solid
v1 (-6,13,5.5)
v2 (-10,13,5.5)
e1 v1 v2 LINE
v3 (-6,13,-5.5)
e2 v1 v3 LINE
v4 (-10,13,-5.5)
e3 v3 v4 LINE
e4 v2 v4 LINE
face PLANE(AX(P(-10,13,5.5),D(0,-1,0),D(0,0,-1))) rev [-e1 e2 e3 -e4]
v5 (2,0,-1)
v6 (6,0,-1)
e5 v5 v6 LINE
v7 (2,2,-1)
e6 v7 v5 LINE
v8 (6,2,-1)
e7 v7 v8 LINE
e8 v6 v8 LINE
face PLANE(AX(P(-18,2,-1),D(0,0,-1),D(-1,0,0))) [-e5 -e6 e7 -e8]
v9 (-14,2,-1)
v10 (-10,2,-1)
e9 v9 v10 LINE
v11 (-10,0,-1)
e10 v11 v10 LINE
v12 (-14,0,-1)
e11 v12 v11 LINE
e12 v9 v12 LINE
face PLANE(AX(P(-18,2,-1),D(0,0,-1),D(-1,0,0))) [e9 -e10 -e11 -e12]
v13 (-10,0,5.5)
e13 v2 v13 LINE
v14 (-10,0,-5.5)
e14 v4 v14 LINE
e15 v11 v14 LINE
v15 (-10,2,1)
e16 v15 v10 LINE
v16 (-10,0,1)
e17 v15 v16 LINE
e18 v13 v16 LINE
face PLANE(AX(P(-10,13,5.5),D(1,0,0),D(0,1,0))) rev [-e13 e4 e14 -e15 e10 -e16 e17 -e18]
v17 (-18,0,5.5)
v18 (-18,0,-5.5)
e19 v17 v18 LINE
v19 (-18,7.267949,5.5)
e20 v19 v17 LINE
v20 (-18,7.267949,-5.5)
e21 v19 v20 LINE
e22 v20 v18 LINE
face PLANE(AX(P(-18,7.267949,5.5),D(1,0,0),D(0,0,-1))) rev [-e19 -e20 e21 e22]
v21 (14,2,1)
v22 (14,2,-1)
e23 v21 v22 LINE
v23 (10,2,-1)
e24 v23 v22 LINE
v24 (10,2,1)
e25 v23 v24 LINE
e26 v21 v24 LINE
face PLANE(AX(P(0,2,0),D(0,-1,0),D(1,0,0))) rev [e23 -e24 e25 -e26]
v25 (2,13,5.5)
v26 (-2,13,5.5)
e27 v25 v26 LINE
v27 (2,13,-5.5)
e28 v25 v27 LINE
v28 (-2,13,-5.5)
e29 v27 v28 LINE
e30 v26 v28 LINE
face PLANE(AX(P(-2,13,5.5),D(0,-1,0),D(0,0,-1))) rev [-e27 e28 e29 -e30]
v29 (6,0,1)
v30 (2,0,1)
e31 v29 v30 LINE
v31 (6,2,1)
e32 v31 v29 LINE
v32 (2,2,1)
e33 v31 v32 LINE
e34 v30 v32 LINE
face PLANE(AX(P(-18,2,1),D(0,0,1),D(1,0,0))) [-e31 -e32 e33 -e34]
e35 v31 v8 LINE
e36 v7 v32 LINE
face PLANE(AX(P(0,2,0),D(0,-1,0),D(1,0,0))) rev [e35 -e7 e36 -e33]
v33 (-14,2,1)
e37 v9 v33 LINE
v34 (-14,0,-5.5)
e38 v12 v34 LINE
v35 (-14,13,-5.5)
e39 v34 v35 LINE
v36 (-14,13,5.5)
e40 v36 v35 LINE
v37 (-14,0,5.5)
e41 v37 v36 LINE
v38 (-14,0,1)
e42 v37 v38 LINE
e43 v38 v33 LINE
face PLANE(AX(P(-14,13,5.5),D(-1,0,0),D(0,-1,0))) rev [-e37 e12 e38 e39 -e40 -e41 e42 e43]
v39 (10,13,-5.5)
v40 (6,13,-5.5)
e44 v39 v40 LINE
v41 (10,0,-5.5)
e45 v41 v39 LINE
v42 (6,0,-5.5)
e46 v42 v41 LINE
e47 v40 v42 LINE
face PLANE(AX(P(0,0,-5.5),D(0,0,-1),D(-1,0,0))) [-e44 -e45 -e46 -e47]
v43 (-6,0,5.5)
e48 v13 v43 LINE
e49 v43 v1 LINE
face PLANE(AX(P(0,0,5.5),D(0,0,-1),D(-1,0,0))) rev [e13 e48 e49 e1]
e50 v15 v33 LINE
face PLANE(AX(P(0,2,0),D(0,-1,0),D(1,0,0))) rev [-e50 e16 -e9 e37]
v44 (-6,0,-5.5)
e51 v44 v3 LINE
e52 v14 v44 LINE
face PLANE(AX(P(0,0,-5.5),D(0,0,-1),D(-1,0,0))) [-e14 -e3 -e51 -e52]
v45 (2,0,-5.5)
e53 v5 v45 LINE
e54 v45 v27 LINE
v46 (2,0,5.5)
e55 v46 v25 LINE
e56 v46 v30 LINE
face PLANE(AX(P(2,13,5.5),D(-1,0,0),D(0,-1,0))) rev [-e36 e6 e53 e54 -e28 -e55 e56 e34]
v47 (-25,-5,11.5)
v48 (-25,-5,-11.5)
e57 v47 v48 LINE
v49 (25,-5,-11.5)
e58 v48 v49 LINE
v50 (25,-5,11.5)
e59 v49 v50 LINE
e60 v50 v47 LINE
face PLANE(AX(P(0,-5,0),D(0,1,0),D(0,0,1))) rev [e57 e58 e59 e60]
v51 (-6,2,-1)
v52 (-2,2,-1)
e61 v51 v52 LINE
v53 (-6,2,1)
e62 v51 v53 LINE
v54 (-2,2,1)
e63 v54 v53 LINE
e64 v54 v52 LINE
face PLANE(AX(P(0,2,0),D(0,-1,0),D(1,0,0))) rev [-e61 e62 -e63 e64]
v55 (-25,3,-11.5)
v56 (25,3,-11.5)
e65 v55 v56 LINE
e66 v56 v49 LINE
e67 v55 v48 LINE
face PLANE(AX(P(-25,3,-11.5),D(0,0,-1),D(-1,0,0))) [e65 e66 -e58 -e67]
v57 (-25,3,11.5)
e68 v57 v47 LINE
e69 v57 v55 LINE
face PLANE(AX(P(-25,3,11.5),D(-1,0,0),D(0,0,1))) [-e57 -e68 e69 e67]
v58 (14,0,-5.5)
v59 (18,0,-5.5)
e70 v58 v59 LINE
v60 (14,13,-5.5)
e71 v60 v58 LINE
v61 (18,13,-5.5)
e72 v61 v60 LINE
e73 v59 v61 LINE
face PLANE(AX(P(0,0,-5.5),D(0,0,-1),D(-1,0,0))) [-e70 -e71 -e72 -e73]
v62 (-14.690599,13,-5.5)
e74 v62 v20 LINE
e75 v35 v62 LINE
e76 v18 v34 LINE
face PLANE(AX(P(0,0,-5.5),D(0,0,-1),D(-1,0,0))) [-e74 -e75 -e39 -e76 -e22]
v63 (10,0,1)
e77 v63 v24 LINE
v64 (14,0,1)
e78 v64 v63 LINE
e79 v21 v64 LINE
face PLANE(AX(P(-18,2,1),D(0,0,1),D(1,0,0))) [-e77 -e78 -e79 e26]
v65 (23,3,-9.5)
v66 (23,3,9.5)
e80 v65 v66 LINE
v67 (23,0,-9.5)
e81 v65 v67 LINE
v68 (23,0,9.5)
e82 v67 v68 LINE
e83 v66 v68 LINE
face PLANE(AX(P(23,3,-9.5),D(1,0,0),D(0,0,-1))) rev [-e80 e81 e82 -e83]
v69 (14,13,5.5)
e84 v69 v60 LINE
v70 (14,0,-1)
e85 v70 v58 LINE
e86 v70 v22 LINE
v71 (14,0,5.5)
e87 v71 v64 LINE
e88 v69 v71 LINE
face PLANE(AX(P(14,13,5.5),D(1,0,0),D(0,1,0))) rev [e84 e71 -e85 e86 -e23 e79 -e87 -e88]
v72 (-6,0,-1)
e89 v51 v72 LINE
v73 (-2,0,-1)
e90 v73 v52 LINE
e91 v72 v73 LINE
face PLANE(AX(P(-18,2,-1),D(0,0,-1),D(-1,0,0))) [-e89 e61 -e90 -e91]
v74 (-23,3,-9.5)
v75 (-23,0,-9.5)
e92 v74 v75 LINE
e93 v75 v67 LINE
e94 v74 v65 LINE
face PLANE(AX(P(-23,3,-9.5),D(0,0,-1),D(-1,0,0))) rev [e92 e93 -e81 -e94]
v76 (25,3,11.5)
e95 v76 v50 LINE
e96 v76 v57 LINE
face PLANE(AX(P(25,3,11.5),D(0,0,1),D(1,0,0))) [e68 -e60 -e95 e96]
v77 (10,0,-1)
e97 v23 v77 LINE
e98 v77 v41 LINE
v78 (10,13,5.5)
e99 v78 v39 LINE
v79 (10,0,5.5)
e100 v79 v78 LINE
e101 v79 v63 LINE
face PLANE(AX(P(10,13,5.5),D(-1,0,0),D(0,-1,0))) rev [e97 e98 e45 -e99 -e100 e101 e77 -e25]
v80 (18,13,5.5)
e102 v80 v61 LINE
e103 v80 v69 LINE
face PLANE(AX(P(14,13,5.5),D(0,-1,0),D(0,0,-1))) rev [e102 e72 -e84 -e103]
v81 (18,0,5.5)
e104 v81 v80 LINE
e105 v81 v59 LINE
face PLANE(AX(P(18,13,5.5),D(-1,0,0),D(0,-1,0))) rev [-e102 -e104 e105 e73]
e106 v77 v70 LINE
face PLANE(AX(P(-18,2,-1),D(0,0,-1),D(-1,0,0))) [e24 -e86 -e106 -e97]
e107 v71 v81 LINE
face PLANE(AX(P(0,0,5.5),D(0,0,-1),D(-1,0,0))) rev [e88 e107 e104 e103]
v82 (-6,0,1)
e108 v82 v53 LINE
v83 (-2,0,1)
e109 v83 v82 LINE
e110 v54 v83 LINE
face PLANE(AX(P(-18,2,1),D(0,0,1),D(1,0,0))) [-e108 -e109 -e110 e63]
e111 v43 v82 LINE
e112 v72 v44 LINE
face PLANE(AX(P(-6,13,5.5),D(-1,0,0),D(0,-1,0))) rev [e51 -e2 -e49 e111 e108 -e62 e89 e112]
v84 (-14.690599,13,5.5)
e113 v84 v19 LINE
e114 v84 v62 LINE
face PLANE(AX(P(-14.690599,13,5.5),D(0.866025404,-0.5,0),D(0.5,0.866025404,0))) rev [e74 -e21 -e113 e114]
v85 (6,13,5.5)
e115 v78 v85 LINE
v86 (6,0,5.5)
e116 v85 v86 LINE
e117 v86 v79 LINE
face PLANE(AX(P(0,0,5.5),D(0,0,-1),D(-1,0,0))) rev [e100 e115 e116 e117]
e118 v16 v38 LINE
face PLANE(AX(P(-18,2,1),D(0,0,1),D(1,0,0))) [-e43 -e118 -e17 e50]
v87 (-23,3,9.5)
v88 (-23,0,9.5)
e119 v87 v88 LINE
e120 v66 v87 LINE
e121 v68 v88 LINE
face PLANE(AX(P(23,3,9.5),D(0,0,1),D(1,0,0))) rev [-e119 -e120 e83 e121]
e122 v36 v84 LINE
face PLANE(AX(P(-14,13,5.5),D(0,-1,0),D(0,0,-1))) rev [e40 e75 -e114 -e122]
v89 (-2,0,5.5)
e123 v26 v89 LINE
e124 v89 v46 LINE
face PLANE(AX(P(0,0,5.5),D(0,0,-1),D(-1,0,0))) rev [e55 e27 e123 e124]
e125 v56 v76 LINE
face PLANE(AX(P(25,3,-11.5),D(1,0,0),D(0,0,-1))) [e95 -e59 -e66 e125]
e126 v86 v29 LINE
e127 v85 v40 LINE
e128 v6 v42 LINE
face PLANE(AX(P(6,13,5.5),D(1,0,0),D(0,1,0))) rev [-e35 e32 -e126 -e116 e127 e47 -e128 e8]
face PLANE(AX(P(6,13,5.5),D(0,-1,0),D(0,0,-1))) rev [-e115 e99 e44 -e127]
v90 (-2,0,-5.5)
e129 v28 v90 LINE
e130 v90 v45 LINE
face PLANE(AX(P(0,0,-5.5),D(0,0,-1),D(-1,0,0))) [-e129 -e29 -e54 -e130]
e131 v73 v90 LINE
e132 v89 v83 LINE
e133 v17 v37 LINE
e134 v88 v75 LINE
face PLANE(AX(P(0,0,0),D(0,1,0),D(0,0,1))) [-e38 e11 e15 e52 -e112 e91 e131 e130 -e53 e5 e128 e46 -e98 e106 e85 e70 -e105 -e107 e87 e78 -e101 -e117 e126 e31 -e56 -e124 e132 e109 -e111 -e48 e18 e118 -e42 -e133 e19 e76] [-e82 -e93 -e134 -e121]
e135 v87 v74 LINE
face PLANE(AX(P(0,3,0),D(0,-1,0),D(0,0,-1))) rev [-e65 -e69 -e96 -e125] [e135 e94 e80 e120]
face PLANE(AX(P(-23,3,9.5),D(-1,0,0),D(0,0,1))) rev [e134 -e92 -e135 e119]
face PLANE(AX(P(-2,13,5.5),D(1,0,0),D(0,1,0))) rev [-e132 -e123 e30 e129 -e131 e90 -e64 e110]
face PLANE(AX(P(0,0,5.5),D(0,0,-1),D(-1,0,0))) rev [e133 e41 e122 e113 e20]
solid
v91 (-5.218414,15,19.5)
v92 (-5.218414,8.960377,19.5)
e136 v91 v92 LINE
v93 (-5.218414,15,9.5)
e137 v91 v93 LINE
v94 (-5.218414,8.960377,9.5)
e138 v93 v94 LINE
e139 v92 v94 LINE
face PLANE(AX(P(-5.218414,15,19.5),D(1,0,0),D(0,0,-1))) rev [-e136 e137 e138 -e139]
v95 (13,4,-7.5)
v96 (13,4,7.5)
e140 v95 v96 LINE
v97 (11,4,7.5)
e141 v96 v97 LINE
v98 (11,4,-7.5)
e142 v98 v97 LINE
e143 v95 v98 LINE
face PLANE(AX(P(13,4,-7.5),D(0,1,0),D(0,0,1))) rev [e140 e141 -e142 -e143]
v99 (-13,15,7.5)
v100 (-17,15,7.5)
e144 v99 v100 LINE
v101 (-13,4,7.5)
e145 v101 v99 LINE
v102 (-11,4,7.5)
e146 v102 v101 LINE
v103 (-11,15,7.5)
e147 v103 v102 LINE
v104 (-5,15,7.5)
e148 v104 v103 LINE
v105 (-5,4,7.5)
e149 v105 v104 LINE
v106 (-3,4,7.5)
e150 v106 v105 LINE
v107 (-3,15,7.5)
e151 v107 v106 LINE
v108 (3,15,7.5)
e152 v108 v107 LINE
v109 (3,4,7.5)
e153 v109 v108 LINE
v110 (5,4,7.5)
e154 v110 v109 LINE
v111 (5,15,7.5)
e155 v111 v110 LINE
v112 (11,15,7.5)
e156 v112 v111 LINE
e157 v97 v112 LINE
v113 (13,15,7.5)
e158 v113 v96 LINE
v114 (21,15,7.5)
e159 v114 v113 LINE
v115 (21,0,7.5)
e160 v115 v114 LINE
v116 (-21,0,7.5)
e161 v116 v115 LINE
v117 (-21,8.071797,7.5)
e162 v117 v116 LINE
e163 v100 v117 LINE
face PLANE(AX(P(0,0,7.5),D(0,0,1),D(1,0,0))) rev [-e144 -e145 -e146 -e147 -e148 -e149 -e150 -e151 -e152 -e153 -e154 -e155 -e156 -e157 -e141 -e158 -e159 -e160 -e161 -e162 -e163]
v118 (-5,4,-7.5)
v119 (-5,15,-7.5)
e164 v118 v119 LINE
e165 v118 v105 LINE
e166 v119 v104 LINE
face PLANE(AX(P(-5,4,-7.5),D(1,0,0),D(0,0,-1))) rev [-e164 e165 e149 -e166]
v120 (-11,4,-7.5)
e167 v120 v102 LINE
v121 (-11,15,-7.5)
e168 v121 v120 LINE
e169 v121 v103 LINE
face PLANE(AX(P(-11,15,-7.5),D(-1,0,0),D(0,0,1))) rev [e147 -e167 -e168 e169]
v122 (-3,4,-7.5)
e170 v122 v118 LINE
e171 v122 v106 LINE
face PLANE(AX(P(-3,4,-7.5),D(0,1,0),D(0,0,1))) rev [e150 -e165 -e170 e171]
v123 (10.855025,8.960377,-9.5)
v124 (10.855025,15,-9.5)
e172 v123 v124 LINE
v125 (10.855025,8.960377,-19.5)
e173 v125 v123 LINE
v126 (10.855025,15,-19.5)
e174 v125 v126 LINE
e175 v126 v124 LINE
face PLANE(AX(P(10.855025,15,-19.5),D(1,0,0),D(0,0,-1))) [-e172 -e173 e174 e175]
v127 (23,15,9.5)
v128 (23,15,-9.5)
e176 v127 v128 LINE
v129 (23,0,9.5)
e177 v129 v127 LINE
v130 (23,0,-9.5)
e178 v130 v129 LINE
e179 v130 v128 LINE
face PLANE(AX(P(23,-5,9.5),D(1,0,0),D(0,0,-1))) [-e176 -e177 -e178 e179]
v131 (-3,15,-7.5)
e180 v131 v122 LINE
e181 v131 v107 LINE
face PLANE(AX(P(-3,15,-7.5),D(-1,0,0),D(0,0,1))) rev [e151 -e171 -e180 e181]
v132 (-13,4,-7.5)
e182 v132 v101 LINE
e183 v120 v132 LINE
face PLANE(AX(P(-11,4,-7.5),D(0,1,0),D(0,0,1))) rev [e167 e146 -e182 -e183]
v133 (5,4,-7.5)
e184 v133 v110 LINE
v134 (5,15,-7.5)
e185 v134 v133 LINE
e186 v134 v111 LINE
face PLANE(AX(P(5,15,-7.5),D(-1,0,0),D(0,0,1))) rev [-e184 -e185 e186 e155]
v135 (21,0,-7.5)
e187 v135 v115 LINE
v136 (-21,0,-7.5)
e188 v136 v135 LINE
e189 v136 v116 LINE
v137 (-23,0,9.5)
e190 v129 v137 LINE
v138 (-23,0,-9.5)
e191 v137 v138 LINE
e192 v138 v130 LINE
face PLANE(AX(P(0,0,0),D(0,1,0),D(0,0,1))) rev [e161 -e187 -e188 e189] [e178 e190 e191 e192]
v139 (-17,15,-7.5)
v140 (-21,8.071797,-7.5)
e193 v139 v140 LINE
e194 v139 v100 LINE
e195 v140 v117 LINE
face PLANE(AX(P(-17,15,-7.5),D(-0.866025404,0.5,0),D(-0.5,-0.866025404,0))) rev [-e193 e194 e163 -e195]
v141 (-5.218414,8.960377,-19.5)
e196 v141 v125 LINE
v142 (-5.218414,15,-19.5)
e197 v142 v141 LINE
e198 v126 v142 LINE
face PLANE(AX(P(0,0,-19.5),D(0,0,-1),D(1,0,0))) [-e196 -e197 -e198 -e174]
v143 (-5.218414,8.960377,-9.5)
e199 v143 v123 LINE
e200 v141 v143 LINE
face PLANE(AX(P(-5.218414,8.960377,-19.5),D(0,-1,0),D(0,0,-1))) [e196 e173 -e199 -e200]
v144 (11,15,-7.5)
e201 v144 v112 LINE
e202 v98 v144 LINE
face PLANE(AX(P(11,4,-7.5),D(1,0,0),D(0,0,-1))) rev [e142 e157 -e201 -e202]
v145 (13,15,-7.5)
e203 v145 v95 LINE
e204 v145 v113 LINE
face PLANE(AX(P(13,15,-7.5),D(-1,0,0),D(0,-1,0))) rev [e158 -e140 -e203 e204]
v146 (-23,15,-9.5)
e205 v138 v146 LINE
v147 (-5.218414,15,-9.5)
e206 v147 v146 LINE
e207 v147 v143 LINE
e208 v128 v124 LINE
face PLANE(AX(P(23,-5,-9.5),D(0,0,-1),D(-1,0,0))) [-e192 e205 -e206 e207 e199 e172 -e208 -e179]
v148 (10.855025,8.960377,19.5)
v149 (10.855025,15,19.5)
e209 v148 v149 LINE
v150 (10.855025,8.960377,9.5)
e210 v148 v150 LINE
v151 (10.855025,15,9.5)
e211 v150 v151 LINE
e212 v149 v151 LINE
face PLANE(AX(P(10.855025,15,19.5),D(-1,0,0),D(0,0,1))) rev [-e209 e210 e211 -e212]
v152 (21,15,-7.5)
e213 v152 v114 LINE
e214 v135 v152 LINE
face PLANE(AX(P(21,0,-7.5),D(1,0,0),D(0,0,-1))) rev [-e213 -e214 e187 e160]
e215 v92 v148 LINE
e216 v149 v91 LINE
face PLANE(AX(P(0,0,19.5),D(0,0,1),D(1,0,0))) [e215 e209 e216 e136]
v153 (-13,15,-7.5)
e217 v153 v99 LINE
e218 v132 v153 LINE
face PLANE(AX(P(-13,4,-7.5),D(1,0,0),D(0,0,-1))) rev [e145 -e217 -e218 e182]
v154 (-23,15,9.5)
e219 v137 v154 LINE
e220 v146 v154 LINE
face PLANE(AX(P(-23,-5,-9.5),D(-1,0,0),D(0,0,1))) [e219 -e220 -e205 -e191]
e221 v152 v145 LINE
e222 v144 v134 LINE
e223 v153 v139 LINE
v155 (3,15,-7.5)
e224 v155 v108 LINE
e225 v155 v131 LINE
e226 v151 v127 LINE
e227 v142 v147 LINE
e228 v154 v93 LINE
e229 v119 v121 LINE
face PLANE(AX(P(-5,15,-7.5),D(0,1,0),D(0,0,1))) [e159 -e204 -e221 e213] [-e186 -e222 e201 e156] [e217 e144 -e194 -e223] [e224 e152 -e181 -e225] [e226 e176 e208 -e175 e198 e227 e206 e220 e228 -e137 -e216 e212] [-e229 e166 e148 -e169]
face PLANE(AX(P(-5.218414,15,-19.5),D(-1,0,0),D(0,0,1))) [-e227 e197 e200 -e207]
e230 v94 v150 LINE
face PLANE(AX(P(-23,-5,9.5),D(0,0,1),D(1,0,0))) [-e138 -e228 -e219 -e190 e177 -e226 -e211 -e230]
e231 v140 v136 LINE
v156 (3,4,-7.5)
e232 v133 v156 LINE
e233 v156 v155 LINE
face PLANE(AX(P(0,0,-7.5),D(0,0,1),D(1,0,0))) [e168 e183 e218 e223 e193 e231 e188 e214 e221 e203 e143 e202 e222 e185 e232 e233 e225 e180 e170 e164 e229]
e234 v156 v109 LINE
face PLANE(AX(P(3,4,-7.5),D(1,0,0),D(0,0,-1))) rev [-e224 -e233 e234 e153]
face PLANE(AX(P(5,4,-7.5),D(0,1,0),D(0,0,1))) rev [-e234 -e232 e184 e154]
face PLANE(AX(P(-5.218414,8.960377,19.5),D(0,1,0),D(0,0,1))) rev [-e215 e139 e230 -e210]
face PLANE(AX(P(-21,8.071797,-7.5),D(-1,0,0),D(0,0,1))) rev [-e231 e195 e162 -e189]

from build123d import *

# Parameters (mm, degrees)
BOSS_EXTRUDE1_DEPTH      = 7.5
BOSS_EXTRUDE1_DEPTH_BACK = 7.5
CUT_EXTRUDE1_DEPTH       = 5.5
CUT_EXTRUDE1_DEPTH_BACK  = 5.5
SKETCH2_W                = 4
SKETCH2_H                = 13
SKETCH3_W                = 36
SKETCH3_H                = 2
CUT_EXTRUDE2_DEPTH       = 2
BOSS_EXTRUDE2_DEPTH      = 15
BOSS_EXTRUDE2_DEPTH_BACK = 5
SKETCH4_W                = 46
SKETCH4_H                = 19
SPLIT1_START             = -5.5
SPLIT1_DEPTH             = 11
SPLIT1_START_2           = -9.5
SPLIT1_2_OUTLINE_W       = 46
SPLIT1_2_OUTLINE_H       = 5
SPLIT1_2_DEPTH           = 19
SPLIT1_START_3           = -1
SPLIT1_3_OUTLINE_W       = 4
SPLIT1_3_OUTLINE_H       = 2
SPLIT1_3_DEPTH           = 2
SPLIT1_START_4           = -5
SPLIT1_4_OUTLINE_W       = 46
SPLIT1_4_OUTLINE_H       = 19
SPLIT1_4_DEPTH           = 5
SPLIT1_5_OUTLINE_W       = 4
SPLIT1_5_OUTLINE_H       = 11
SPLIT1_5_DEPTH           = 13
SPLIT1_6_OUTLINE_W       = 4
SPLIT1_6_OUTLINE_H       = 2
SPLIT1_6_DEPTH           = 2
SKETCH5_W                = 16.073439162
SKETCH5_H                = 6.039622656
BOSS_EXTRUDE3_DEPTH      = 10
SKETCH6_W                = 50
SKETCH6_H                = 23
SKETCH6_W_2              = 46
SKETCH6_H_2              = 19
BOSS_EXTRUDE4_DEPTH      = 8


# Read off the part's stored shape, not the designer's step: Split1
with BuildPart() as part:
    # Sketch1 → Boss-Extrude1 (new, two sides: drawn at the far end of the back side and taken through both)
    with BuildSketch(Plane.XY.offset(-BOSS_EXTRUDE1_DEPTH_BACK)):
        Polygon((-21, 0), (21, 0), (21, 15), (13, 15), (13, 4), (11, 4), (11, 15), (5, 15), (5, 4), (3, 4), (3, 15), (-3, 15), (-3, 4), (-5, 4), (-5, 15), (-11, 15), (-11, 4), (-13, 4), (-13, 15), (-17, 15), (-21, 8.07179677), align=None)
    extrude(amount=BOSS_EXTRUDE1_DEPTH + BOSS_EXTRUDE1_DEPTH_BACK)

    # Sketch2 → Cut-Extrude1 (cut, two sides: drawn at the far end of the back side and taken through both)
    with BuildSketch(Plane.XY.offset(-CUT_EXTRUDE1_DEPTH_BACK)):
        Polygon((-14, 13), (-14, 0), (-18, 0), (-18, 7.267949192), (-14.690598923, 13), align=None)
        with Locations((-8, 6.5)):
            Rectangle(SKETCH2_W, SKETCH2_H)
        with Locations((0, 6.5)):
            Rectangle(SKETCH2_W, SKETCH2_H)
        with Locations((8, 6.5)):
            Rectangle(SKETCH2_W, SKETCH2_H)
        with Locations((16, 6.5)):
            Rectangle(SKETCH2_W, SKETCH2_H)
    extrude(amount=CUT_EXTRUDE1_DEPTH + CUT_EXTRUDE1_DEPTH_BACK, mode=Mode.SUBTRACT)

    # Sketch3 → Cut-Extrude2 (cut)
    with BuildSketch(Plane(origin=(0, 0, 0), x_dir=(-1, 0, 0), z_dir=(0, -1, 0))):
        Rectangle(SKETCH3_W, SKETCH3_H)
    extrude(amount=-CUT_EXTRUDE2_DEPTH, mode=Mode.SUBTRACT)


with BuildPart() as body_2:
    # Sketch4 → Boss-Extrude2 (new, two sides: drawn at the far end of the back side and taken through both)
    with BuildSketch(Plane(origin=(0, 0, 0), x_dir=(1, 0, 0), z_dir=(0, 1, 0)).offset(-BOSS_EXTRUDE2_DEPTH_BACK)):
        Rectangle(SKETCH4_W, SKETCH4_H)
    extrude(amount=BOSS_EXTRUDE2_DEPTH + BOSS_EXTRUDE2_DEPTH_BACK)

    # Combine1: cut part
    add(part.part, mode=Mode.SUBTRACT)

    # Split1 4 outline → Split1 4 (cut)
    with BuildSketch(Plane(origin=(0, 0, 0), x_dir=(1, 0, 0), z_dir=(0, 1, 0)).offset(SPLIT1_START_4)):
        Rectangle(SPLIT1_4_OUTLINE_W, SPLIT1_4_OUTLINE_H)
    extrude(amount=SPLIT1_4_DEPTH, mode=Mode.SUBTRACT)

    # Split1 5 outline → Split1 5 (cut)
    with BuildSketch(Plane(origin=(0, 0, 0), x_dir=(1, 0, 0), z_dir=(0, 1, 0))):
        with Locations((-8, 0)):
            Rectangle(SPLIT1_5_OUTLINE_W, SPLIT1_5_OUTLINE_H)
        Rectangle(SPLIT1_5_OUTLINE_W, SPLIT1_5_OUTLINE_H)
        with Locations((-16, 0)):
            Rectangle(SPLIT1_5_OUTLINE_W, SPLIT1_5_OUTLINE_H)
        with Locations((8, 0)):
            Rectangle(SPLIT1_5_OUTLINE_W, SPLIT1_5_OUTLINE_H)
        with Locations((16, 0)):
            Rectangle(SPLIT1_5_OUTLINE_W, SPLIT1_5_OUTLINE_H)
    extrude(amount=SPLIT1_5_DEPTH, mode=Mode.SUBTRACT)

    # Split1 6 outline → Split1 6 (cut)
    with BuildSketch(Plane(origin=(0, 0, 0), x_dir=(1, 0, 0), z_dir=(0, 1, 0))):
        with Locations((-4, 0)):
            Rectangle(SPLIT1_6_OUTLINE_W, SPLIT1_6_OUTLINE_H)
        with Locations((-12, 0)):
            Rectangle(SPLIT1_6_OUTLINE_W, SPLIT1_6_OUTLINE_H)
        with Locations((4, 0)):
            Rectangle(SPLIT1_6_OUTLINE_W, SPLIT1_6_OUTLINE_H)
        with Locations((12, 0)):
            Rectangle(SPLIT1_6_OUTLINE_W, SPLIT1_6_OUTLINE_H)
    extrude(amount=SPLIT1_6_DEPTH, mode=Mode.SUBTRACT)

    # Sketch5 → Boss-Extrude3 (add)
    with BuildSketch(Plane.XY.offset(9.5)):
        with Locations((2.818305229, 11.980188672)):
            Rectangle(SKETCH5_W, SKETCH5_H)
    boss_extrude3 = extrude(amount=BOSS_EXTRUDE3_DEPTH)

    # Mirror1: Boss-Extrude3 across plane
    add(boss_extrude3.mirror(Plane.XY))


with BuildPart() as body_2_2:
    # Split1 outline → Split1 (new body)
    with BuildSketch(Plane.XY.offset(SPLIT1_START)):
        Polygon((18, 0), (18, 13), (14, 13), (14, 0), (10, 0), (10, 13), (6, 13), (6, 0), (2, 0), (2, 13), (-2, 13), (-2, 0), (-6, 0), (-6, 13), (-10, 13), (-10, 0), (-14, 0), (-14, 13), (-14.690598923, 13), (-18, 7.267949192), (-18, 0), (-23, 0), (-23, -5), (23, -5), (23, 0), align=None)
    extrude(amount=SPLIT1_DEPTH)

    # Split1 2 outline → Split1 2 (add)
    with BuildSketch(Plane.XY.offset(SPLIT1_START_2)):
        with Locations((0, -2.5)):
            Rectangle(SPLIT1_2_OUTLINE_W, SPLIT1_2_OUTLINE_H)
    extrude(amount=SPLIT1_2_DEPTH)

    # Split1 3 outline → Split1 3 (add)
    with BuildSketch(Plane.XY.offset(SPLIT1_START_3)):
        with Locations((12, 1)):
            Rectangle(SPLIT1_3_OUTLINE_W, SPLIT1_3_OUTLINE_H)
        with Locations((4, 1)):
            Rectangle(SPLIT1_3_OUTLINE_W, SPLIT1_3_OUTLINE_H)
        with Locations((-4, 1)):
            Rectangle(SPLIT1_3_OUTLINE_W, SPLIT1_3_OUTLINE_H)
        with Locations((-12, 1)):
            Rectangle(SPLIT1_3_OUTLINE_W, SPLIT1_3_OUTLINE_H)
    extrude(amount=SPLIT1_3_DEPTH)

    # Sketch6 → Boss-Extrude4 (add)
    with BuildSketch(Plane.XZ.offset(5)):
        Rectangle(SKETCH6_W, SKETCH6_H)
        Rectangle(SKETCH6_W_2, SKETCH6_H_2, mode=Mode.SUBTRACT)
    extrude(amount=-BOSS_EXTRUDE4_DEPTH)


solid = Compound([body_2.part, body_2_2.part])
